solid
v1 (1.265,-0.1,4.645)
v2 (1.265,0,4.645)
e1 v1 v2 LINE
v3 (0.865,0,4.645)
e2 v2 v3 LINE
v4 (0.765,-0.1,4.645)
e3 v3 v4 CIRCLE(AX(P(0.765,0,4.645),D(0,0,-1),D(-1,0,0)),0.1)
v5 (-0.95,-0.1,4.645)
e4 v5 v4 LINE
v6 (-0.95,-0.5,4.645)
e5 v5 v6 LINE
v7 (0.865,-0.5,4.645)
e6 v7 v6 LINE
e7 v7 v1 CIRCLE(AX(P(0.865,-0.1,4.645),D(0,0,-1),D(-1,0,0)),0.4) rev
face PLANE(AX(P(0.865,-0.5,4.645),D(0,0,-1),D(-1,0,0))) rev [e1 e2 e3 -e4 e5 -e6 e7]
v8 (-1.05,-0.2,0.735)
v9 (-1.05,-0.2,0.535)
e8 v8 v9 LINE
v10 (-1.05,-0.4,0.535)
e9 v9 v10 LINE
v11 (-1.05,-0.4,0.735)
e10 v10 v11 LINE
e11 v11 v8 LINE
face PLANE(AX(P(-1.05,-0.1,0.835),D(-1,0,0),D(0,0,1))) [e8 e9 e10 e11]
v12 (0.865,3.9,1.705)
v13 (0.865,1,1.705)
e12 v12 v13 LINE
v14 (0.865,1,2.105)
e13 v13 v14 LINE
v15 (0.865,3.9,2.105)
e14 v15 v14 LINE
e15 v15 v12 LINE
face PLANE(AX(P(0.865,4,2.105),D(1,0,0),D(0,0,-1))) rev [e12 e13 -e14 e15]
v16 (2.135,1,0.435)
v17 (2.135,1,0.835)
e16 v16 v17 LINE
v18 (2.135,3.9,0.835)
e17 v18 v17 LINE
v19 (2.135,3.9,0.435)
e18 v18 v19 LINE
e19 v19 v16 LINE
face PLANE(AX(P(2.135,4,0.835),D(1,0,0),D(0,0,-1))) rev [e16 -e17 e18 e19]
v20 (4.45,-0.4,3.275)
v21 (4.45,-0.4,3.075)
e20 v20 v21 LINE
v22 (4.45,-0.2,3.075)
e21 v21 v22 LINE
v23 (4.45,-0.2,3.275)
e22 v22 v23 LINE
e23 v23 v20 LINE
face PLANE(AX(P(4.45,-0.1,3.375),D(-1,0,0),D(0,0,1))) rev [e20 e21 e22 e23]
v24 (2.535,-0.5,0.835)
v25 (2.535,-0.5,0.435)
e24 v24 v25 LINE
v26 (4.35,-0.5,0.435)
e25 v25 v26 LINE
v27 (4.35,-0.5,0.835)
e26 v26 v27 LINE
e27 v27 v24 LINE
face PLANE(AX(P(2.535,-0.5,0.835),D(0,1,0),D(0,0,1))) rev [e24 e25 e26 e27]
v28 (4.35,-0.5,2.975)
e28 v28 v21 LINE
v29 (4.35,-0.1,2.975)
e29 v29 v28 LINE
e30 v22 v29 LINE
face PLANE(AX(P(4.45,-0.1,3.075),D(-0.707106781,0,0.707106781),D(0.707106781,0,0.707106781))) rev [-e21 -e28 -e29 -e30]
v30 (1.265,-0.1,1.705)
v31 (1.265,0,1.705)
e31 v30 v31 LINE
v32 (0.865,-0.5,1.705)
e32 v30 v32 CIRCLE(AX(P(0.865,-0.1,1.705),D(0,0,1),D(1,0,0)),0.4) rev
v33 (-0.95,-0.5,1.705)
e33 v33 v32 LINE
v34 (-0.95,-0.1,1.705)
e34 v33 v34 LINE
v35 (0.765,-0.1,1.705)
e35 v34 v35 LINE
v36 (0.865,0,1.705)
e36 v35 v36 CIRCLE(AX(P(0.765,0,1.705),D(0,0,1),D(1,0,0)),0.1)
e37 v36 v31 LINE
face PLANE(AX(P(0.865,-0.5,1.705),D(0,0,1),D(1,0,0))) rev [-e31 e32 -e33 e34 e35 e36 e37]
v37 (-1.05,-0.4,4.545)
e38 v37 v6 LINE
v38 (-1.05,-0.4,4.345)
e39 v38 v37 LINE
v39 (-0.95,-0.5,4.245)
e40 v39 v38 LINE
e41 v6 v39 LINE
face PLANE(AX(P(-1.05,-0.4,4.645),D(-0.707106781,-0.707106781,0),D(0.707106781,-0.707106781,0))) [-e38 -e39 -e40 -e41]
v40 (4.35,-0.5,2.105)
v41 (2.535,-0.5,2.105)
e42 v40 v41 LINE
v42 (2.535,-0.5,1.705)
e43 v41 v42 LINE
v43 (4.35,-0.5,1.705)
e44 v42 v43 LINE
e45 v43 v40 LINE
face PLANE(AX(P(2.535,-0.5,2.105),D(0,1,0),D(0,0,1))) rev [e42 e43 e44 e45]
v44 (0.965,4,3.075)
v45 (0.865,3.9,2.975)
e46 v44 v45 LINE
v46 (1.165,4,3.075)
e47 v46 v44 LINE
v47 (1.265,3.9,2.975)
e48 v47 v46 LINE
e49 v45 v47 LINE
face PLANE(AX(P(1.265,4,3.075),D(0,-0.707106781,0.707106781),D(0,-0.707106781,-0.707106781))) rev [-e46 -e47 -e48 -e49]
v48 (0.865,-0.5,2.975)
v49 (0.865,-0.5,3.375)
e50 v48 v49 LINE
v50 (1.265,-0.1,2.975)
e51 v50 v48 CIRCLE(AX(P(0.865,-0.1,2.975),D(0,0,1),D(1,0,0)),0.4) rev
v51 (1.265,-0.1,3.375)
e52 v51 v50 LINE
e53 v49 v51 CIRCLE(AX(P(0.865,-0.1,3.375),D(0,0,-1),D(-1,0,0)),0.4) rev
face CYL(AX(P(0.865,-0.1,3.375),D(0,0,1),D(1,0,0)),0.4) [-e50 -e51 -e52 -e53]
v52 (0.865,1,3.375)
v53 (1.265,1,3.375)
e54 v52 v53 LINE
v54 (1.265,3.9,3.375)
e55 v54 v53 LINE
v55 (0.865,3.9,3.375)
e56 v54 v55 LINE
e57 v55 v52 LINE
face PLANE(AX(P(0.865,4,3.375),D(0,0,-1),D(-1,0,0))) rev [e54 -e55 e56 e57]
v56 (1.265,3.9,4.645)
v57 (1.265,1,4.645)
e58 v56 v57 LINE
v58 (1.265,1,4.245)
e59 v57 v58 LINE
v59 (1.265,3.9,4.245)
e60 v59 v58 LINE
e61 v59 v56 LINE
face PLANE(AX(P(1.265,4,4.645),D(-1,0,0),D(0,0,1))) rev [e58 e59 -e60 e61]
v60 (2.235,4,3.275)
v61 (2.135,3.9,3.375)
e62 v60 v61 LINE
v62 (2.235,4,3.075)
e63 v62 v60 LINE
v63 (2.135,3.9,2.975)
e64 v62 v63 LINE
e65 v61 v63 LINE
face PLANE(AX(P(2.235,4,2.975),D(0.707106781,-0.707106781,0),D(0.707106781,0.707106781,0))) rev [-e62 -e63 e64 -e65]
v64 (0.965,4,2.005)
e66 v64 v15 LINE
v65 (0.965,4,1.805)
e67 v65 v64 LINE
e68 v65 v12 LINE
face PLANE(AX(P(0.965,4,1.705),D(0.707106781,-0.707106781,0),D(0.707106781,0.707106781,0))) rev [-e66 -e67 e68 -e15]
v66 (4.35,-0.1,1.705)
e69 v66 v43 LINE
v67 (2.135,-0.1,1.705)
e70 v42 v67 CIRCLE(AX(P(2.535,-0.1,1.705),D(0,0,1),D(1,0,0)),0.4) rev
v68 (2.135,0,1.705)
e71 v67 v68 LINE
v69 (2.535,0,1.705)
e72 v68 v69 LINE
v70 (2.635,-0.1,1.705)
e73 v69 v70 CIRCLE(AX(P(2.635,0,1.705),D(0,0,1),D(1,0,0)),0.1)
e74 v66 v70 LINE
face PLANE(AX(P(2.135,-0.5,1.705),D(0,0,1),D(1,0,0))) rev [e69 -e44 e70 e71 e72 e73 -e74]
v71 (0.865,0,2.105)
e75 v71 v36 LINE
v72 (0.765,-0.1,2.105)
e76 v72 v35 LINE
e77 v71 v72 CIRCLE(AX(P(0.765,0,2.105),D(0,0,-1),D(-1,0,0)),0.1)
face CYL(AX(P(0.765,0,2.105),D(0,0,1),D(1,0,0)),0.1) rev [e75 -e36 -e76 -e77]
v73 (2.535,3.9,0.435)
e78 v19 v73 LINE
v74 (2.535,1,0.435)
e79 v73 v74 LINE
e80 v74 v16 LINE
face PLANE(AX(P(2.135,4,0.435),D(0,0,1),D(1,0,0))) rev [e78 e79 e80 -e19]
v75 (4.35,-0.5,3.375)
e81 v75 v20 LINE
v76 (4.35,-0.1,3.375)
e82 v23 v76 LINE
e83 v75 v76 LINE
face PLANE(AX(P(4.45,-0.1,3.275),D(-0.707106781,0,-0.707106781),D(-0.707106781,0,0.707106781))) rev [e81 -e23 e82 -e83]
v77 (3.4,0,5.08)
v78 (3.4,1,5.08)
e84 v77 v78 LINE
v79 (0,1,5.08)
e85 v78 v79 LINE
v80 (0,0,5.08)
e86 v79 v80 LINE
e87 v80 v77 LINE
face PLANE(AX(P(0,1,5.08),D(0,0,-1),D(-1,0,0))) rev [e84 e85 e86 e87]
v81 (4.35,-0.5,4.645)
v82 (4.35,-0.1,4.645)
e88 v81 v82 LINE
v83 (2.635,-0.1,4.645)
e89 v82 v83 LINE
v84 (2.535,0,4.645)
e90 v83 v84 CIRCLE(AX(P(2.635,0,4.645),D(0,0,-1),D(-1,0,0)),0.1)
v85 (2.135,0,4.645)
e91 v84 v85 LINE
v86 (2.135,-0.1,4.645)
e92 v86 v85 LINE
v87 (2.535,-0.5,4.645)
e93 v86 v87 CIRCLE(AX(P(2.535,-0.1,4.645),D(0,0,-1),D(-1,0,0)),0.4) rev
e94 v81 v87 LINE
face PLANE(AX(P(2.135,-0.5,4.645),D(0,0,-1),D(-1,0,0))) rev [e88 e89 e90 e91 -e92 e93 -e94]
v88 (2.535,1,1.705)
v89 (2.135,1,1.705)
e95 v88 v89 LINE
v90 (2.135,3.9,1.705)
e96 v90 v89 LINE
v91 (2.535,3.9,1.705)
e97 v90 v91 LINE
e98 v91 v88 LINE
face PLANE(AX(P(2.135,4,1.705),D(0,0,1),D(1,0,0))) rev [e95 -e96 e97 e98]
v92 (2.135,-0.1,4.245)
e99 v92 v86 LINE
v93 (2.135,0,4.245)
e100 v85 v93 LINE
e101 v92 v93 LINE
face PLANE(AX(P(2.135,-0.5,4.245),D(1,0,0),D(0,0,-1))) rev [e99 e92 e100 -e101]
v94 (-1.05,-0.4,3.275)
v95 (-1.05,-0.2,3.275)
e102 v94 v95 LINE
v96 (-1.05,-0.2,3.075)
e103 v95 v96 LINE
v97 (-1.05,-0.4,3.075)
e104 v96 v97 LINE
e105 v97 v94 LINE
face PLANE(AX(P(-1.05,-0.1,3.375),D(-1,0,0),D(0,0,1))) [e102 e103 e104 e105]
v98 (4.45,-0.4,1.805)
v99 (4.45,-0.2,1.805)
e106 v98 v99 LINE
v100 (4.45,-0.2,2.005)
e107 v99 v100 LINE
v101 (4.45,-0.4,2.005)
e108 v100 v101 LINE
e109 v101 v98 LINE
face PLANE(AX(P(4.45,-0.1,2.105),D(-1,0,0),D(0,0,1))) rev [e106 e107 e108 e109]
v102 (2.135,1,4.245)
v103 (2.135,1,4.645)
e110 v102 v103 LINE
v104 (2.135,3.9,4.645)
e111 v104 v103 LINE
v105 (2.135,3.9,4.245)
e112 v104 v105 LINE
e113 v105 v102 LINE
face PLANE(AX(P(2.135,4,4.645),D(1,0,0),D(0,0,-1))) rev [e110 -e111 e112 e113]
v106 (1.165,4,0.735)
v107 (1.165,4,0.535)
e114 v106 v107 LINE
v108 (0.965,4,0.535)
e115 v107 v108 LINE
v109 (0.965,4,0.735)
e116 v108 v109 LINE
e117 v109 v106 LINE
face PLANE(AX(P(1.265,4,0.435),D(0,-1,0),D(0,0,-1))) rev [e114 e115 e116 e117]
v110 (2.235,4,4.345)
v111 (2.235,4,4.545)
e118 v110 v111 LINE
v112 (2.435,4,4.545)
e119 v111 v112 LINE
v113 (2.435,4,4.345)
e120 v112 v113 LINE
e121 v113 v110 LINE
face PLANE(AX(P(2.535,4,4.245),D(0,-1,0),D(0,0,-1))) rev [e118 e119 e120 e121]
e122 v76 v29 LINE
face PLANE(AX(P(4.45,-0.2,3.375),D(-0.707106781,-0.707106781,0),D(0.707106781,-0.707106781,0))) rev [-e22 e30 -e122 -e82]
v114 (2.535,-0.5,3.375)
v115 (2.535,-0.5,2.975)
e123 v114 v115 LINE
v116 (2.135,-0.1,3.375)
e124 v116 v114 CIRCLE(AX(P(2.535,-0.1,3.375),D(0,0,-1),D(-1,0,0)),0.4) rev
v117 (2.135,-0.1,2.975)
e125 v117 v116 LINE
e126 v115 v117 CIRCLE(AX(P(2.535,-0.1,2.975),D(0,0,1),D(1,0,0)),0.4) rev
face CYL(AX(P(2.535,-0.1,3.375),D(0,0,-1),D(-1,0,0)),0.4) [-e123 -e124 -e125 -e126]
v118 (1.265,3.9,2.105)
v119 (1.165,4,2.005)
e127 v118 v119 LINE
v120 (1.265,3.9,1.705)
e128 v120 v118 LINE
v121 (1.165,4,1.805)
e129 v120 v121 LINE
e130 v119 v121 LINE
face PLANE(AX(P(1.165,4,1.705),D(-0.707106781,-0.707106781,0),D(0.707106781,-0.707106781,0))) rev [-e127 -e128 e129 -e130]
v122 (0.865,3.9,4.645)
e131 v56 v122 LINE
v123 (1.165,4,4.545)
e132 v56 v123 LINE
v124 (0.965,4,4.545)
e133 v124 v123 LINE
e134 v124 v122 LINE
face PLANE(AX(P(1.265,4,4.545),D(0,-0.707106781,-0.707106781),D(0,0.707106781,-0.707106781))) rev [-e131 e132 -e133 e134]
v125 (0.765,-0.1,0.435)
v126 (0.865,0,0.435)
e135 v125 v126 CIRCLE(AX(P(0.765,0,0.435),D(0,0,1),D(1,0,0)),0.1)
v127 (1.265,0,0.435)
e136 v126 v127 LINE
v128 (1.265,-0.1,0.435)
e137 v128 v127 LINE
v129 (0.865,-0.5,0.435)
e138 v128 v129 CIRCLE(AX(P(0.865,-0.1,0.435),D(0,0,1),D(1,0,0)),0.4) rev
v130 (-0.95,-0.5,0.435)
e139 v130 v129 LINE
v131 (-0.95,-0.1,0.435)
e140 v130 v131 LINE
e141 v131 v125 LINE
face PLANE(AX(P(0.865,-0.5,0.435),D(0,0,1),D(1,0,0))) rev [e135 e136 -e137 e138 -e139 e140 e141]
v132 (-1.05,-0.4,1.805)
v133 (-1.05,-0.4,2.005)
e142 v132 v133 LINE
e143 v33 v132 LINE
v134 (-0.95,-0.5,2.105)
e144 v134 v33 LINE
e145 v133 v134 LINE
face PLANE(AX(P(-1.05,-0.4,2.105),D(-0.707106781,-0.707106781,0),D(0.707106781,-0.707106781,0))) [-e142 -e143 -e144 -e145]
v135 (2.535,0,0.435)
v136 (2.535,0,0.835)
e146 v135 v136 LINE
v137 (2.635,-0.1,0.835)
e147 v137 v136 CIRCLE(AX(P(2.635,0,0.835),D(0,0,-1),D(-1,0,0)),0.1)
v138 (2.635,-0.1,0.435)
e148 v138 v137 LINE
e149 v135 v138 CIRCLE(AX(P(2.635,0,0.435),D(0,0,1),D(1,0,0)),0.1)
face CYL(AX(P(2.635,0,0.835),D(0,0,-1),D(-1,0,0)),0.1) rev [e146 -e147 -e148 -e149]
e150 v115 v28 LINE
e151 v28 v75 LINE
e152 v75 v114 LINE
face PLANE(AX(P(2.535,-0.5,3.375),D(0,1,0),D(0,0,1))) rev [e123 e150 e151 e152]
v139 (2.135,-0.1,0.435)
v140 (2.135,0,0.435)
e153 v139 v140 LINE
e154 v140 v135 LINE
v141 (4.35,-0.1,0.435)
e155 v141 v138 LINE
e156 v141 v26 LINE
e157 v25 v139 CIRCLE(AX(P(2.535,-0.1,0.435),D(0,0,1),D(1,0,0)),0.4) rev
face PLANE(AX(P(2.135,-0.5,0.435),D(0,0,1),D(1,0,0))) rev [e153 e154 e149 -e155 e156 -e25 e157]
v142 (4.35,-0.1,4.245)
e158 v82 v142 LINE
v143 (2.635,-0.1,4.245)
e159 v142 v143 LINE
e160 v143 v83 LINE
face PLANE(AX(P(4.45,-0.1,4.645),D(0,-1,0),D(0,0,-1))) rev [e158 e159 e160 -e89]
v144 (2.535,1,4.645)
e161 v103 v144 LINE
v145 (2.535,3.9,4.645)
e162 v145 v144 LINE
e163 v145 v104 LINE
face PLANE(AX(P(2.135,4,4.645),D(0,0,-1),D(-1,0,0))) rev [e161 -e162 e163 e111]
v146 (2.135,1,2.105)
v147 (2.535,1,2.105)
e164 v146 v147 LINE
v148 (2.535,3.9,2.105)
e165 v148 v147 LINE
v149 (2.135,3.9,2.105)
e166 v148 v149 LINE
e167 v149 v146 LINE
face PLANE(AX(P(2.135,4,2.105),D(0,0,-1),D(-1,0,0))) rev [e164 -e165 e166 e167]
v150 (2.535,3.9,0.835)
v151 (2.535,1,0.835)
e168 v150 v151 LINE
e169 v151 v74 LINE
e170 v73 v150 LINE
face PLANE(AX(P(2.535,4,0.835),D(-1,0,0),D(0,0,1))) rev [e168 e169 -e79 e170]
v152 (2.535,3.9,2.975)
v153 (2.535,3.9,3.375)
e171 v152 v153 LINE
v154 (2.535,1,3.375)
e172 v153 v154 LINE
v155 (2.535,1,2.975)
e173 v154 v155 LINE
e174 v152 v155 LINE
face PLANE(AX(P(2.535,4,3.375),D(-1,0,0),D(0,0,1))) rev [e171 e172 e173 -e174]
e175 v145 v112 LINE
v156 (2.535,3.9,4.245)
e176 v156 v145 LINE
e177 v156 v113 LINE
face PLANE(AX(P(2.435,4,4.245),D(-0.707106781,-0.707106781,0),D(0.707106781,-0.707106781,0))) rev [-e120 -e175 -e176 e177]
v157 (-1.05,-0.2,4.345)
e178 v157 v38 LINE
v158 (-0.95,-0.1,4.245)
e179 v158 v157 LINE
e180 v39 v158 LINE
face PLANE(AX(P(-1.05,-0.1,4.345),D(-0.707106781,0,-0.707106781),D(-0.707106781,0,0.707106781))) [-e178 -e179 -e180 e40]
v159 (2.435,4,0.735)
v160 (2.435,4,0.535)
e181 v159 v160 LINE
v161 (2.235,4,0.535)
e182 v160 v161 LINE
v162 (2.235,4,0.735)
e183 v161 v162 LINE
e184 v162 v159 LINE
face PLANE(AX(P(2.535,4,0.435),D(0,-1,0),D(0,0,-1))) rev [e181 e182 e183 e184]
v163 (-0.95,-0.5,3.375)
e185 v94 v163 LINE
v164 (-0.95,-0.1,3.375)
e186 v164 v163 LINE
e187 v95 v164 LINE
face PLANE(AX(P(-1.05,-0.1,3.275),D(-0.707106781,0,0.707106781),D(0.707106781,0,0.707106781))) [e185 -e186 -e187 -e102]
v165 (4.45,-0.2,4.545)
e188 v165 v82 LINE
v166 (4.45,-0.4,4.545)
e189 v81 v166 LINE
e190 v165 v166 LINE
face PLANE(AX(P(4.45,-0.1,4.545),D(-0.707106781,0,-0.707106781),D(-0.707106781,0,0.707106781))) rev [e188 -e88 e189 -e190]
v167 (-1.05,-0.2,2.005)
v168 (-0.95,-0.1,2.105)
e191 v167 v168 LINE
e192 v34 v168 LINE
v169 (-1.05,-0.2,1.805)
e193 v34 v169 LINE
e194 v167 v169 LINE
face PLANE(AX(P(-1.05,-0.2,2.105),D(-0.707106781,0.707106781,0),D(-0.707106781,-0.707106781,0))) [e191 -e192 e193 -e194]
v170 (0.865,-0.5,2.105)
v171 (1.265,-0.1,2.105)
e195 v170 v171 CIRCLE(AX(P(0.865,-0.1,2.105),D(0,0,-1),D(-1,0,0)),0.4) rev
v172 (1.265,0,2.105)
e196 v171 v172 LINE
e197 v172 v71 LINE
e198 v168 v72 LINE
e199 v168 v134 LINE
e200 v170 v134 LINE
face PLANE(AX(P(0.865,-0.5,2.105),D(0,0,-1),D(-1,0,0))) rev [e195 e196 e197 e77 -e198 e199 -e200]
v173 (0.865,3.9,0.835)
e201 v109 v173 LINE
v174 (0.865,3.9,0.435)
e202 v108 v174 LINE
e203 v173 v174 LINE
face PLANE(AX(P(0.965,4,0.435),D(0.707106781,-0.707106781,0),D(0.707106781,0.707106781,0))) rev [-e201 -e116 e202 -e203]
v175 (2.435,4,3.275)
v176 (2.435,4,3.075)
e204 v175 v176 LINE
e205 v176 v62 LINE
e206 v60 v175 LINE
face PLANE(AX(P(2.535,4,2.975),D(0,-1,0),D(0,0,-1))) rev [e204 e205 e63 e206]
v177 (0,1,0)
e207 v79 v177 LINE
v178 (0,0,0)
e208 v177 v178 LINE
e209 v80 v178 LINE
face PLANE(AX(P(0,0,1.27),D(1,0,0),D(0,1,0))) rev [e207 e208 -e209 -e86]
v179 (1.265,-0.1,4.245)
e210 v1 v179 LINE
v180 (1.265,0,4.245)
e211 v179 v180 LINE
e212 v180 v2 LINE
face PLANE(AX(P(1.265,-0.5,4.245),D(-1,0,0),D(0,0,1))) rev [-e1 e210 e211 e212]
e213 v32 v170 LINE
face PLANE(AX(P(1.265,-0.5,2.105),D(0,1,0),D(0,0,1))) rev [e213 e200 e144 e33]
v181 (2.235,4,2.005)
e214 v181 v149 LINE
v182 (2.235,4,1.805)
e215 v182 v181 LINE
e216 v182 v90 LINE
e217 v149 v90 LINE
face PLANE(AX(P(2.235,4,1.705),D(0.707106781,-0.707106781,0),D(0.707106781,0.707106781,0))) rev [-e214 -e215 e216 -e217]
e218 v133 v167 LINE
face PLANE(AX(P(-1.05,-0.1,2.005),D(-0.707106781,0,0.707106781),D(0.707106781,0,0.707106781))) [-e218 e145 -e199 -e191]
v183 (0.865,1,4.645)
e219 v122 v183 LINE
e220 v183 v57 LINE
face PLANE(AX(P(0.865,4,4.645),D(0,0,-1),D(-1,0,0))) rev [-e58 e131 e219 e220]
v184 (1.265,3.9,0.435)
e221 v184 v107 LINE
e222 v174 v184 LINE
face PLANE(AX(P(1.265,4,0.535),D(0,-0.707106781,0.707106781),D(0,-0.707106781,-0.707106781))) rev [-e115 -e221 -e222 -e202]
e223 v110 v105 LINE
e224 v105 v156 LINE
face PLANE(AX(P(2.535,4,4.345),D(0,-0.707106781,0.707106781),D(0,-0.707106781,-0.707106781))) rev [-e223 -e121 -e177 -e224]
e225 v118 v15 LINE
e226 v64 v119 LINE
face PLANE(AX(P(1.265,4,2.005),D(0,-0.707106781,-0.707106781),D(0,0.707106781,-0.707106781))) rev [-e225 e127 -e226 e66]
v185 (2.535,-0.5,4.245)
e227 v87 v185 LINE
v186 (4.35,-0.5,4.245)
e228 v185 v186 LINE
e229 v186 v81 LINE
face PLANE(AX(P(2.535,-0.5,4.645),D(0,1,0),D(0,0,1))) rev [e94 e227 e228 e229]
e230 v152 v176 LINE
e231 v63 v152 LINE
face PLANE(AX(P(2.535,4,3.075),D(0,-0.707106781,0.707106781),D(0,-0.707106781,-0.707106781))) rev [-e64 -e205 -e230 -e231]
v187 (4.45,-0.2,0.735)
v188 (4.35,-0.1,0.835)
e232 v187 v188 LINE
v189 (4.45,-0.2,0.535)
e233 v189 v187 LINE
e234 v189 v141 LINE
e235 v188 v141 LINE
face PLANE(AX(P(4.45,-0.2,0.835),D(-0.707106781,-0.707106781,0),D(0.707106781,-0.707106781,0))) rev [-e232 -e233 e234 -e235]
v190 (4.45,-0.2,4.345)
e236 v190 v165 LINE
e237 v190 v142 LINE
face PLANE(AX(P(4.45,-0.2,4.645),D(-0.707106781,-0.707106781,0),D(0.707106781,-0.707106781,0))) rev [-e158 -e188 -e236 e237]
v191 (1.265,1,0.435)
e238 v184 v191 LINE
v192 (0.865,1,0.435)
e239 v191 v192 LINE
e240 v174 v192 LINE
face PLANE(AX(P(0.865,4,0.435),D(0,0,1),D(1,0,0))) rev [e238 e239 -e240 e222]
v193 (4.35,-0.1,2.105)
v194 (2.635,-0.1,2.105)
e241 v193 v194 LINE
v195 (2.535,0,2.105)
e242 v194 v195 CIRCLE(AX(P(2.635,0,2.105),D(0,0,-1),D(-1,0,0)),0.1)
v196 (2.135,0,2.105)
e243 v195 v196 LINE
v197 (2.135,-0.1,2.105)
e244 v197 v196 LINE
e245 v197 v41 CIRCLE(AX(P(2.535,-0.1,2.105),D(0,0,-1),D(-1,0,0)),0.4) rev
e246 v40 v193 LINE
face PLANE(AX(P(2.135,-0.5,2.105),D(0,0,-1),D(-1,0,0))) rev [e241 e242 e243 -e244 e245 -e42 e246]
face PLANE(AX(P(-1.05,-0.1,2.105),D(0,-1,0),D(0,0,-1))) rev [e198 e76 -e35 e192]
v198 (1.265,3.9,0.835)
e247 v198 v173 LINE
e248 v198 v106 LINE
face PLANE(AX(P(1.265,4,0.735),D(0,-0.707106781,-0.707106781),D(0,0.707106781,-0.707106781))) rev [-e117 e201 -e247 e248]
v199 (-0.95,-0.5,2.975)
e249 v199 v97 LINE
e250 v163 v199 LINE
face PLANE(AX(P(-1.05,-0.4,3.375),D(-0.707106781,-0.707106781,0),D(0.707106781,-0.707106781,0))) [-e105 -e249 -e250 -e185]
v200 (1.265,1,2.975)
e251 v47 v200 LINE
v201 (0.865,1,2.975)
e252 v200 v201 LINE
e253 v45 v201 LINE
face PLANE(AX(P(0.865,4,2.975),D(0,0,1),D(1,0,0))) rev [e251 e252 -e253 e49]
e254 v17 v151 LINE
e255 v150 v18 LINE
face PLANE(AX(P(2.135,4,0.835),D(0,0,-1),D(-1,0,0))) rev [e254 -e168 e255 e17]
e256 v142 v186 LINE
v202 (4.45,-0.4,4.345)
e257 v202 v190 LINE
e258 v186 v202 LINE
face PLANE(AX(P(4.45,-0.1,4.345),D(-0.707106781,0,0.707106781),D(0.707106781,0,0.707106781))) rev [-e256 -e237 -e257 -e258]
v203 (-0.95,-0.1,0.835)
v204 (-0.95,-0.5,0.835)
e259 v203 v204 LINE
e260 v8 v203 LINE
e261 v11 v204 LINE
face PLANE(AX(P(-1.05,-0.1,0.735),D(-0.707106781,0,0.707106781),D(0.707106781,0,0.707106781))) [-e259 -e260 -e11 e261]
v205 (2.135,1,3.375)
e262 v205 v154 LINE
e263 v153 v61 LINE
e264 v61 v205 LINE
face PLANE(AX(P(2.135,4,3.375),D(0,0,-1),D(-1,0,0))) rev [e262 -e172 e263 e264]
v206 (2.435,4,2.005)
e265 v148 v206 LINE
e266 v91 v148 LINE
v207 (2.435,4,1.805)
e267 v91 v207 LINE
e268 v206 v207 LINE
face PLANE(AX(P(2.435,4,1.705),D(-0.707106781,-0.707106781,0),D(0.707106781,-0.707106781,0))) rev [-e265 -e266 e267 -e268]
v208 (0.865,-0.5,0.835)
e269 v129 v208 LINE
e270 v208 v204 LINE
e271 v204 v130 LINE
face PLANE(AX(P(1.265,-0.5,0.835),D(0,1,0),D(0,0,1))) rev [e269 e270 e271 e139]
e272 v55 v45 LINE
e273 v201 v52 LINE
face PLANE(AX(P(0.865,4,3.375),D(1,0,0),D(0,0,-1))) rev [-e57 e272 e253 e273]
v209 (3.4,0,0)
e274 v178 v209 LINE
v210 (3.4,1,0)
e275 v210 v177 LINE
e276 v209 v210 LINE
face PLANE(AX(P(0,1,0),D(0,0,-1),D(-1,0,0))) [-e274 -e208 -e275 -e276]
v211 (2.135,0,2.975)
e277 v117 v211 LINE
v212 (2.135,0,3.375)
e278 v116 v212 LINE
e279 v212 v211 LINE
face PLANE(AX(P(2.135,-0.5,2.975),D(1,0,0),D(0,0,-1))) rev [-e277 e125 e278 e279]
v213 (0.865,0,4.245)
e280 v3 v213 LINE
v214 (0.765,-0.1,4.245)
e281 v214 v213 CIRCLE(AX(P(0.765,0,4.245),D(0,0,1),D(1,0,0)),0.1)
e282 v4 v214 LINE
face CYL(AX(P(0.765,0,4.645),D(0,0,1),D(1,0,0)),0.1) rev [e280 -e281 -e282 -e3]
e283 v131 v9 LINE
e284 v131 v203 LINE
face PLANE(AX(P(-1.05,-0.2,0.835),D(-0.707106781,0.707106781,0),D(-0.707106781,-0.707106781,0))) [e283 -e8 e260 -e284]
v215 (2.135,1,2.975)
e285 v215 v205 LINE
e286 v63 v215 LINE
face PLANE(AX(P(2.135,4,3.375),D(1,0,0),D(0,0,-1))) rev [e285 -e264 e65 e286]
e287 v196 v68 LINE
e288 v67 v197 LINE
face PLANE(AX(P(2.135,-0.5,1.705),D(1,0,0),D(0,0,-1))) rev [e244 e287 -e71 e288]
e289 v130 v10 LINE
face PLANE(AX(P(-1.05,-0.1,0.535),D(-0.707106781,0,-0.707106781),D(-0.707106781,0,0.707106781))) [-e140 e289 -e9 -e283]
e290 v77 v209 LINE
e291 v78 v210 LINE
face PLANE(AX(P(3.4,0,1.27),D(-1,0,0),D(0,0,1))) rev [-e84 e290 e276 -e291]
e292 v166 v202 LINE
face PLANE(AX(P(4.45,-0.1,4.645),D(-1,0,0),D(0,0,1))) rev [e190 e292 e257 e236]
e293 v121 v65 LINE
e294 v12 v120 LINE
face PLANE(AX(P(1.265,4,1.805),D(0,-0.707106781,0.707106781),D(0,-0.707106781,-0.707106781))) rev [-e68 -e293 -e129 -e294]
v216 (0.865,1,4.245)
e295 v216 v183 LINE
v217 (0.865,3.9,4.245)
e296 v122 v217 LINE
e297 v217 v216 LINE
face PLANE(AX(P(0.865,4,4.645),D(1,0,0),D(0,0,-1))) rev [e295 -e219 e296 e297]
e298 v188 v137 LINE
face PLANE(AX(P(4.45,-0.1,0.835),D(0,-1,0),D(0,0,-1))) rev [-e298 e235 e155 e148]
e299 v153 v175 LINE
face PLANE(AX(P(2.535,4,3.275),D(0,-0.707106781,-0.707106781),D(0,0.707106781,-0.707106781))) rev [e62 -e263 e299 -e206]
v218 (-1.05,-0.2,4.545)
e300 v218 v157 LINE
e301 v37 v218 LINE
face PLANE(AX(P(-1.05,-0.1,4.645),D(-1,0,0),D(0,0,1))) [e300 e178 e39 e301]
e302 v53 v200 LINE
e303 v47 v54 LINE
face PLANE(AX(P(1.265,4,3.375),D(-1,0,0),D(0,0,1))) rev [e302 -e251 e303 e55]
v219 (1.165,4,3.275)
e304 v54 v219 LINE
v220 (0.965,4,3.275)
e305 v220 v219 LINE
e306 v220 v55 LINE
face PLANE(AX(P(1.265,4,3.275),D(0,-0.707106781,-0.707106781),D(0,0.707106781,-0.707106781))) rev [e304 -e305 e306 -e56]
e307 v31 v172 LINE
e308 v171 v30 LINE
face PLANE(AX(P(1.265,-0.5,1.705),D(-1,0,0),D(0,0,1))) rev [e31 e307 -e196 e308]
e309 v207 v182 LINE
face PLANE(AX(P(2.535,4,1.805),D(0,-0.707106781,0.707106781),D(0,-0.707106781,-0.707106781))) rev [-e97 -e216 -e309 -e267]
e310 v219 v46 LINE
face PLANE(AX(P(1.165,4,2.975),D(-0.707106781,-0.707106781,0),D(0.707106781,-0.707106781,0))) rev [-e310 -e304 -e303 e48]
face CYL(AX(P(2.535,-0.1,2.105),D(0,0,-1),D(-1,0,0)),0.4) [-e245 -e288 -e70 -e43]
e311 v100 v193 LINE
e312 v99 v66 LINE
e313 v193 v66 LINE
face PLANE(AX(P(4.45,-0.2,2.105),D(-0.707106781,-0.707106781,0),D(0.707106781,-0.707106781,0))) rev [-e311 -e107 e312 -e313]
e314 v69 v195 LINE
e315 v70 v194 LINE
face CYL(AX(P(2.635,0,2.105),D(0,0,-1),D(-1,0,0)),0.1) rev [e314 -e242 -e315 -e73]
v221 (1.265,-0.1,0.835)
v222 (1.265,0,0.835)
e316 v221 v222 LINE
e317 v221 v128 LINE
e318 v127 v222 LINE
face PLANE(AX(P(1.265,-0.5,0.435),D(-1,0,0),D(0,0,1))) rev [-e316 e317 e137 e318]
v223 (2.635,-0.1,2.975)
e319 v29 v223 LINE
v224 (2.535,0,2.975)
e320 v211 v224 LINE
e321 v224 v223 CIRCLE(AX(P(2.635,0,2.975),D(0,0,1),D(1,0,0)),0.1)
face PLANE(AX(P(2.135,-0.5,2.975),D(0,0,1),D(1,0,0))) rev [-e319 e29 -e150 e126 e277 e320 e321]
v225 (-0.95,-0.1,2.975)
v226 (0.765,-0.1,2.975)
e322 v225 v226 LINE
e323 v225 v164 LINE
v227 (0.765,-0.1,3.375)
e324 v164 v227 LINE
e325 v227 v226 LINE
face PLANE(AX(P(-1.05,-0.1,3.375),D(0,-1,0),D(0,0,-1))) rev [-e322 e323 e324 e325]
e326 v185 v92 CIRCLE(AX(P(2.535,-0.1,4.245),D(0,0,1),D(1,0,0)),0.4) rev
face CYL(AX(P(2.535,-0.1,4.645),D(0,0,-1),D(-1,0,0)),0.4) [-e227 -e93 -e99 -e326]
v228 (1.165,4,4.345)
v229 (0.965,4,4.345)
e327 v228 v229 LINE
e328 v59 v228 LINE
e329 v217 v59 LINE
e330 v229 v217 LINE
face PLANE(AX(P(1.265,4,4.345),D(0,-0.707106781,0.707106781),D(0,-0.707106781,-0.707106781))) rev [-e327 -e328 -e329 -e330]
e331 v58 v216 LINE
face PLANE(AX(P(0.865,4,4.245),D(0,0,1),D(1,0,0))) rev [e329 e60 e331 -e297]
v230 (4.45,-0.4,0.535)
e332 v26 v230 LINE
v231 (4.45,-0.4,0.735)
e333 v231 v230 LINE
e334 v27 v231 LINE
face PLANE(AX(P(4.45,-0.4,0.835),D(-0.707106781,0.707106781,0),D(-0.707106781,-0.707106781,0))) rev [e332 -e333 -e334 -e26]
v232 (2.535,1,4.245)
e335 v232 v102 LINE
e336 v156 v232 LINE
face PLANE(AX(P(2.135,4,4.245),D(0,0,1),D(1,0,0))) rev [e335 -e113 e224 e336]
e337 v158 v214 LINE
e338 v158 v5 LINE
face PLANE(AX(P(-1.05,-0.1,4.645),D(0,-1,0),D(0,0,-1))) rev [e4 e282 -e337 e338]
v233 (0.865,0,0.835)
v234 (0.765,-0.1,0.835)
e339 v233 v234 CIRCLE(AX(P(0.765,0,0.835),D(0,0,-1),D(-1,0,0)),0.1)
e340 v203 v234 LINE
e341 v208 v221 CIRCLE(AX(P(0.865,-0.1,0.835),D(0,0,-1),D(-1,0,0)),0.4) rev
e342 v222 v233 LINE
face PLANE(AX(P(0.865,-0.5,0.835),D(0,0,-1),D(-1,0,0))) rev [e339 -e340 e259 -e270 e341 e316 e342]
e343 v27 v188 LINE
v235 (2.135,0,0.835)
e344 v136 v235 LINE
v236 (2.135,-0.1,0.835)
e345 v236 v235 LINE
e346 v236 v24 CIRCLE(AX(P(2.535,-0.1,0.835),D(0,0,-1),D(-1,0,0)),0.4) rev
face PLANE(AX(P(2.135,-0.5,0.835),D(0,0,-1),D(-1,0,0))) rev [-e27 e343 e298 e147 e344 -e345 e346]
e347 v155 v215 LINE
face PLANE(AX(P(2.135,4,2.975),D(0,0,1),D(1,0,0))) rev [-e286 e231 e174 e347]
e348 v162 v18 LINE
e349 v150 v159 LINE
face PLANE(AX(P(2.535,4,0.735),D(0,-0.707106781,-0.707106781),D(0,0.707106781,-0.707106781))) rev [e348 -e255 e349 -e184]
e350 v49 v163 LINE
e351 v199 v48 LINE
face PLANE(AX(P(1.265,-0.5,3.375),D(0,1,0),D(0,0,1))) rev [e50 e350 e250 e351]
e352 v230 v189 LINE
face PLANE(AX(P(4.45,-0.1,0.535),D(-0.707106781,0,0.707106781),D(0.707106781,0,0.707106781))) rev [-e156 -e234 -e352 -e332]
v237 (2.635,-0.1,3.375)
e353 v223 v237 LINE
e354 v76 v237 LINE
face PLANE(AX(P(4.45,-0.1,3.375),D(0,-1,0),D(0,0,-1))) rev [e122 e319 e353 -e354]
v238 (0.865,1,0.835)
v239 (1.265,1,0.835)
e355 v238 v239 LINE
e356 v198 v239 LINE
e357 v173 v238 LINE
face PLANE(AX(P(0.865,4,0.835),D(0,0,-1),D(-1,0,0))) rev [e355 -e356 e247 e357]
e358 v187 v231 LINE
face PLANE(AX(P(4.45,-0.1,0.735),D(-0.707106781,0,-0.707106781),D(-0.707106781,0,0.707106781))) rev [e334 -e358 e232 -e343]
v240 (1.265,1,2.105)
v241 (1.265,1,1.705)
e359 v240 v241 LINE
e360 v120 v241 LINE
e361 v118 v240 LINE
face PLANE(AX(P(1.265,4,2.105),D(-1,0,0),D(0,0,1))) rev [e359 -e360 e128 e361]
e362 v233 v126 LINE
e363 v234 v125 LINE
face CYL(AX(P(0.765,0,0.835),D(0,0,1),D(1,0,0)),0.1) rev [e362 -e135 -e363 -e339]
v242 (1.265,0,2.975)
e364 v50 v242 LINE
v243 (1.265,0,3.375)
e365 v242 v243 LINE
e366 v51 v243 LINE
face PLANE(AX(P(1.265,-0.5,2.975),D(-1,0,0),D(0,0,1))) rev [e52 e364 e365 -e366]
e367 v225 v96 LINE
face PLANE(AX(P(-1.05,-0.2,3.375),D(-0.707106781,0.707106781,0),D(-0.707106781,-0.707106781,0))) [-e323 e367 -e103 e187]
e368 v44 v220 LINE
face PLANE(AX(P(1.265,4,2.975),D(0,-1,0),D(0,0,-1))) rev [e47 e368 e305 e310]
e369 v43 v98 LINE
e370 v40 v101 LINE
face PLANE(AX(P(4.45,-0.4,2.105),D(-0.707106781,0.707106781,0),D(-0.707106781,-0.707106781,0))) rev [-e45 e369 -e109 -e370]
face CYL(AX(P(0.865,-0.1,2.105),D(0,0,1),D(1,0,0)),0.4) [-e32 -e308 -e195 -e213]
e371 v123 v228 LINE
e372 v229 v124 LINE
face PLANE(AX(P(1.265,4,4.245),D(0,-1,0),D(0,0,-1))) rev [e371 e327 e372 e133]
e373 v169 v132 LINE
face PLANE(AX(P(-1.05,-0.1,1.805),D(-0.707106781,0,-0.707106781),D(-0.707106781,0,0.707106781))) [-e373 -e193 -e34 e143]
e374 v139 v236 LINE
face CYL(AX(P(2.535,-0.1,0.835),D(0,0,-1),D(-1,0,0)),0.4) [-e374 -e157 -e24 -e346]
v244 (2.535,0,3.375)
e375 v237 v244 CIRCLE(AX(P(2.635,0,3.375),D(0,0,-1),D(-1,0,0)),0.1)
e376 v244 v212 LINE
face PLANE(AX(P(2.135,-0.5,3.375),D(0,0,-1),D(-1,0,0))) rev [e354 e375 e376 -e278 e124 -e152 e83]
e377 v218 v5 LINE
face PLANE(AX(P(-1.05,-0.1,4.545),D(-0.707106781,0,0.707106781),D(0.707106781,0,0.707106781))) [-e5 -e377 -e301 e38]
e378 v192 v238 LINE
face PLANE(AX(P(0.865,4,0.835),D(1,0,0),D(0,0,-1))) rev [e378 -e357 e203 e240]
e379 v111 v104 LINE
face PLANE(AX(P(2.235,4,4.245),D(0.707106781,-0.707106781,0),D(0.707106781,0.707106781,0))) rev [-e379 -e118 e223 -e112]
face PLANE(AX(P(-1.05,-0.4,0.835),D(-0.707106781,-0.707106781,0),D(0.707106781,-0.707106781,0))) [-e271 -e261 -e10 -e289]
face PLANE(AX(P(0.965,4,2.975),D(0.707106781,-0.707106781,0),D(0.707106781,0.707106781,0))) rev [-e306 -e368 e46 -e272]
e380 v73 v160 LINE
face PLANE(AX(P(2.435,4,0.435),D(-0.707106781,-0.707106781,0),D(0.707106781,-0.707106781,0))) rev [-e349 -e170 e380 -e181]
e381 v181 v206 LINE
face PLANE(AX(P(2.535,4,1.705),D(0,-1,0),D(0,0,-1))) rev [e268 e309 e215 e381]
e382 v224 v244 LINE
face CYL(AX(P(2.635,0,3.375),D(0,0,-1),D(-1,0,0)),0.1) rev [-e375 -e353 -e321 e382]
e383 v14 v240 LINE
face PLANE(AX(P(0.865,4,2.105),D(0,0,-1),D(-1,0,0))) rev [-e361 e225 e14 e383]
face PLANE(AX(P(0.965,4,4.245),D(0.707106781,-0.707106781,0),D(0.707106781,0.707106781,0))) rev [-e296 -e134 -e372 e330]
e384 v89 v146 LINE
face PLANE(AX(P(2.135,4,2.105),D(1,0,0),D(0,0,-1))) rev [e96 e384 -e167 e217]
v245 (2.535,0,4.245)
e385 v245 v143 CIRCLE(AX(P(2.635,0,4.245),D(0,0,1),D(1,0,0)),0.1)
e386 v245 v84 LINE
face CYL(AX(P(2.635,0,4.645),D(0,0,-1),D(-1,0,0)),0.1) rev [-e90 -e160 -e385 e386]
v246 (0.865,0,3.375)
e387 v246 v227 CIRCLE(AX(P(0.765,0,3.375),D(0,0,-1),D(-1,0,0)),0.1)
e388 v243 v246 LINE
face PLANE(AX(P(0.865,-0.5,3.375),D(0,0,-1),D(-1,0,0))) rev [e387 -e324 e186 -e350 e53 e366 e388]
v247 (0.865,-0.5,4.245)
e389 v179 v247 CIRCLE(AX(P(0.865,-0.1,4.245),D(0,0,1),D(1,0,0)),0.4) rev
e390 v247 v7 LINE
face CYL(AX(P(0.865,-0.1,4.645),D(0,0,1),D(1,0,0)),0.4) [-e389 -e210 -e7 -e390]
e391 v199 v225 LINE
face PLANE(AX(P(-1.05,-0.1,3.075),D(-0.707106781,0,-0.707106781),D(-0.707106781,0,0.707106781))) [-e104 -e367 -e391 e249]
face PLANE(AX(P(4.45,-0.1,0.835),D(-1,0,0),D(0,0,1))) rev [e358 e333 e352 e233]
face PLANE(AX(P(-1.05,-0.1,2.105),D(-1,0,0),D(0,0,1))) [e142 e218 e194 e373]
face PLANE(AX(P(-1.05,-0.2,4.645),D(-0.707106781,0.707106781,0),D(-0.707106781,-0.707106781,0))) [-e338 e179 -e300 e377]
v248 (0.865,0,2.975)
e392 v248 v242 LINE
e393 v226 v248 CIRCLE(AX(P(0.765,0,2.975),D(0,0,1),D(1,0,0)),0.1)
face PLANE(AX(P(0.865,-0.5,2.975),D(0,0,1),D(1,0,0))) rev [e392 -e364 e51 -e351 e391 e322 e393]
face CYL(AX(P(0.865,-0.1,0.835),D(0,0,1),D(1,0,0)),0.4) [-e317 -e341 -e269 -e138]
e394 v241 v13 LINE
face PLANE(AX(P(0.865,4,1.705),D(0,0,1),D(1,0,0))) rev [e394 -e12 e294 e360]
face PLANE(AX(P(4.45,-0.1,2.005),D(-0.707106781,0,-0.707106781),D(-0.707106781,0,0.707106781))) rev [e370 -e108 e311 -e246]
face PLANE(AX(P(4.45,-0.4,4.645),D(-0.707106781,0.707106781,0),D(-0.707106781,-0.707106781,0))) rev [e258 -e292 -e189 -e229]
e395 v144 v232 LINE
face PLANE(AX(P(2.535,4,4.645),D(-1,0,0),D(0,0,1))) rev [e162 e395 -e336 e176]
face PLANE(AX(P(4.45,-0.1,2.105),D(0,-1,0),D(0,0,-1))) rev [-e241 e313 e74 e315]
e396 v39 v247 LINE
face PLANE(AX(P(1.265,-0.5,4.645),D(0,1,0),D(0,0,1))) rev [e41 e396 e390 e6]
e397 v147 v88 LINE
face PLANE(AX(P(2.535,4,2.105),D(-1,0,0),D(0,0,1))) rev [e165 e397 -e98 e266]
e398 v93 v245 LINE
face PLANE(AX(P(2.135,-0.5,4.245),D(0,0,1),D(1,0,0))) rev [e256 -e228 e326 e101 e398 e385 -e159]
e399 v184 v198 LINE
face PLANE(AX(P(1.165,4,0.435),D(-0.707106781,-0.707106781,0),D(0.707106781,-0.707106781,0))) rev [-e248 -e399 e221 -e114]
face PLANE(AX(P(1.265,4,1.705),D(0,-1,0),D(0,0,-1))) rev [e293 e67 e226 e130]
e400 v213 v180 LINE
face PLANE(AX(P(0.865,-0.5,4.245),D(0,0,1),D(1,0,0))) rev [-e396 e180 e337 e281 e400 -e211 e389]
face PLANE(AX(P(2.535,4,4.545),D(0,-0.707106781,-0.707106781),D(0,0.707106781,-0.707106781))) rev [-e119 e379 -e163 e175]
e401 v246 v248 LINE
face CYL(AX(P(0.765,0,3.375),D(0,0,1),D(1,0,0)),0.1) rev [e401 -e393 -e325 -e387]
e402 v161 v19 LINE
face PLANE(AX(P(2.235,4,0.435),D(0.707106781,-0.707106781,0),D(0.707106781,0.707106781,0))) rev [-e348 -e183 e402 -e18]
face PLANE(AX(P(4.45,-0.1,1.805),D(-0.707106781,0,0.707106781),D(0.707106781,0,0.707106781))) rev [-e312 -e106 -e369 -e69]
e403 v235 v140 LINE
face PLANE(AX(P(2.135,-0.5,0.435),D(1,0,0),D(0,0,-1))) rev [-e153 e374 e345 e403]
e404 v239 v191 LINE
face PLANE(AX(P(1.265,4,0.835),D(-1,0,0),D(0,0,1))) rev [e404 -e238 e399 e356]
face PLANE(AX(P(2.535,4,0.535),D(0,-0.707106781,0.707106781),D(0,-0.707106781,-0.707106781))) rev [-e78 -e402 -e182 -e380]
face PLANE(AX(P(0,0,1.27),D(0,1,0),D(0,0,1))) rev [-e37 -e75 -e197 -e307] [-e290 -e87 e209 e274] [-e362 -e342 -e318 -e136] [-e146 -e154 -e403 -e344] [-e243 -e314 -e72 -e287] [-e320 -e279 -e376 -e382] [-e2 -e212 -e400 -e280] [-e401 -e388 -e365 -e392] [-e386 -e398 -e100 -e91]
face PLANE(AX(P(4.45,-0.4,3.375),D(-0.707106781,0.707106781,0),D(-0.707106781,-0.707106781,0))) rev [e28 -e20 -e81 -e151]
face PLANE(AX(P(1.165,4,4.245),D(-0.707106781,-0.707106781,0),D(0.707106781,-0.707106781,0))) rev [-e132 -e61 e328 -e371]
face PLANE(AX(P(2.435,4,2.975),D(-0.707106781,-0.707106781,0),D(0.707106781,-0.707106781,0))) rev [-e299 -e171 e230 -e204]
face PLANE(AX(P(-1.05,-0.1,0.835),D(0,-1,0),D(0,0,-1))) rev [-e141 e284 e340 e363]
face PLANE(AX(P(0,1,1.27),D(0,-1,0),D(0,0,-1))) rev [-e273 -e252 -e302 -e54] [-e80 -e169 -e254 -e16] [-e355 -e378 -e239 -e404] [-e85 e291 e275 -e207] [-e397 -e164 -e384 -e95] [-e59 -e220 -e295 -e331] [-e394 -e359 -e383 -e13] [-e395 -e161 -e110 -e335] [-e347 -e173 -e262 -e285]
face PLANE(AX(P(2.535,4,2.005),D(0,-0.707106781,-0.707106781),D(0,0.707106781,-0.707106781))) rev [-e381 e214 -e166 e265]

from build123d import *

# Parameters (mm, degrees)
SKIZZE1_W                         = 3.4
SKIZZE1_H                         = 1
AUFSATZ_LINEAR_AUSTRAGEN1_DEPTH   = 1.27
SKIZZE3_W                         = 0.4
SKIZZE3_H                         = 0.4
AUFSATZ_LINEAR_AUSTRAGEN3_DEPTH   = 0.5
SKIZZE4_W                         = 0.4
SKIZZE4_H                         = 0.4
AUFSATZ_LINEAR_AUSTRAGEN4_DEPTH   = 1.915
SKIZZE5_W                         = 0.4
SKIZZE5_H                         = 0.4
AUFSATZ_LINEAR_AUSTRAGEN5_DEPTH   = 1.915
SKIZZE6_W                         = 0.4
SKIZZE6_H                         = 0.4
AUFSATZ_LINEAR_AUSTRAGEN6_DEPTH   = 3
FASE2_SIZE                        = 0.1
VERRUNDUNG1_R                     = 0.1
VERRUNDUNG2_R                     = 0.4
LINEARES_MUSTER1_COUNT            = 4
LINEARES_MUSTER1_PITCH            = 1.27
FASE2_OF_LINEARES_MUSTER1_SIZE    = 0.1
VERRUNDUNG1_OF_LINEARES_MUSTER1_R = 0.1
VERRUNDUNG2_OF_LINEARES_MUSTER1_R = 0.4


with BuildPart() as part:
    # Skizze1 → Aufsatz-Linear austragen1 (new body)
    with BuildSketch(Plane.XY):
        with Locations((1.7, 0.5)):
            Rectangle(SKIZZE1_W, SKIZZE1_H)
    aufsatz_linear_austragen1 = extrude(amount=AUFSATZ_LINEAR_AUSTRAGEN1_DEPTH)

    # Skizze3 → Aufsatz-Linear austragen3 (add)
    with BuildSketch(Plane.XZ):
        with Locations((1.065, 0.635)):
            Rectangle(SKIZZE3_W, SKIZZE3_H)
        with Locations((2.335, 0.635)):
            Rectangle(SKIZZE3_W, SKIZZE3_H)
    aufsatz_linear_austragen3 = extrude(amount=AUFSATZ_LINEAR_AUSTRAGEN3_DEPTH)

    # Skizze4 → Aufsatz-Linear austragen4 (add)
    with BuildSketch(Plane(origin=(2.535, 0, 0), x_dir=(0, 0, -1), z_dir=(1, 0, 0))):
        with Locations((-0.635, -0.3)):
            Rectangle(SKIZZE4_W, SKIZZE4_H)
    aufsatz_linear_austragen4 = extrude(amount=AUFSATZ_LINEAR_AUSTRAGEN4_DEPTH)

    # Skizze5 → Aufsatz-Linear austragen5 (add)
    with BuildSketch(Plane.ZY.offset(-0.865)):
        with Locations((0.635, -0.3)):
            Rectangle(SKIZZE5_W, SKIZZE5_H)
    aufsatz_linear_austragen5 = extrude(amount=AUFSATZ_LINEAR_AUSTRAGEN5_DEPTH)

    # Skizze6 → Aufsatz-Linear austragen6 (add)
    with BuildSketch(Plane(origin=(0, 1, 0), x_dir=(1, 0, 0), z_dir=(0, 1, 0))):
        with Locations((1.065, -0.635)):
            Rectangle(SKIZZE6_W, SKIZZE6_H)
        with Locations((2.335, -0.635)):
            Rectangle(SKIZZE6_W, SKIZZE6_H)
    aufsatz_linear_austragen6 = extrude(amount=AUFSATZ_LINEAR_AUSTRAGEN6_DEPTH)

    # Fase2
    fase2_edges = [part.edges().sort_by_distance(p)[0] for p in [
        (4.45, -0.3, 0.835),
        (4.45, -0.5, 0.635),
        (4.45, -0.3, 0.435),
        (4.45, -0.1, 0.635),
        (-1.05, -0.3, 0.835),
        (-1.05, -0.1, 0.635),
        (-1.05, -0.3, 0.435),
        (-1.05, -0.5, 0.635),
        (1.265, 4, 0.635),
        (1.065, 4, 0.435),
        (0.865, 4, 0.635),
        (1.065, 4, 0.835),
        (2.535, 4, 0.635),
        (2.335, 4, 0.435),
        (2.135, 4, 0.635),
        (2.335, 4, 0.835),
    ]]
    chamfer(fase2_edges, length=FASE2_SIZE)

    # Verrundung1
    verrundung1_edges = [part.edges().sort_by_distance(p)[0] for p in [
        (0.865, -0.1, 0.635),
        (2.535, -0.1, 0.635),
    ]]
    fillet(verrundung1_edges, radius=VERRUNDUNG1_R - 0.0001)  # a hair under: the kernel refuses the full size

    # Verrundung2
    verrundung2_edges = [part.edges().sort_by_distance(p)[0] for p in [
        (1.265, -0.5, 0.635),
        (2.135, -0.5, 0.635),
    ]]
    fillet(verrundung2_edges, radius=VERRUNDUNG2_R)

    # Lineares Muster1: Aufsatz-Linear austragen1, Aufsatz-Linear austragen3, Aufsatz-Linear austragen4, Aufsatz-Linear austragen5, Aufsatz-Linear austragen6 ×4
    with Locations(*[(0, 0, i * LINEARES_MUSTER1_PITCH) for i in range(1, LINEARES_MUSTER1_COUNT)]):
        add(aufsatz_linear_austragen1)
        add(aufsatz_linear_austragen3)
        add(aufsatz_linear_austragen4)
        add(aufsatz_linear_austragen5)
        add(aufsatz_linear_austragen6)

    # Fase2 of Lineares Muster1
    fase2_of_lineares_muster1_edges = [part.edges().sort_by_distance(p)[0] for p in [
        (4.45, -0.3, 2.105),
        (4.45, -0.5, 1.905),
        (4.45, -0.3, 1.705),
        (4.45, -0.1, 1.905),
        (-1.05, -0.3, 2.105),
        (-1.05, -0.1, 1.905),
        (-1.05, -0.3, 1.705),
        (-1.05, -0.5, 1.905),
        (1.265, 4, 1.905),
        (1.065, 4, 1.705),
        (0.865, 4, 1.905),
        (1.065, 4, 2.105),
        (2.535, 4, 1.905),
        (2.335, 4, 1.705),
        (2.135, 4, 1.905),
        (2.335, 4, 2.105),
        (4.45, -0.3, 3.375),
        (4.45, -0.5, 3.175),
        (4.45, -0.3, 2.975),
        (4.45, -0.1, 3.175),
        (-1.05, -0.3, 3.375),
        (-1.05, -0.1, 3.175),
        (-1.05, -0.3, 2.975),
        (-1.05, -0.5, 3.175),
        (1.265, 4, 3.175),
        (1.065, 4, 2.975),
        (0.865, 4, 3.175),
        (1.065, 4, 3.375),
        (2.535, 4, 3.175),
        (2.335, 4, 2.975),
        (2.135, 4, 3.175),
        (2.335, 4, 3.375),
        (4.45, -0.3, 4.645),
        (4.45, -0.5, 4.445),
        (4.45, -0.3, 4.245),
        (4.45, -0.1, 4.445),
        (-1.05, -0.3, 4.645),
        (-1.05, -0.1, 4.445),
        (-1.05, -0.3, 4.245),
        (-1.05, -0.5, 4.445),
        (1.265, 4, 4.445),
        (1.065, 4, 4.245),
        (0.865, 4, 4.445),
        (1.065, 4, 4.645),
        (2.535, 4, 4.445),
        (2.335, 4, 4.245),
        (2.135, 4, 4.445),
        (2.335, 4, 4.645),
    ]]
    chamfer(fase2_of_lineares_muster1_edges, length=FASE2_OF_LINEARES_MUSTER1_SIZE)

    # Verrundung1 of Lineares Muster1
    verrundung1_of_lineares_muster1_edges = [part.edges().sort_by_distance(p)[0] for p in [
        (0.865, -0.1, 1.905),
        (2.535, -0.1, 1.905),
        (0.865, -0.1, 3.175),
        (2.535, -0.1, 3.175),
        (0.865, -0.1, 4.445),
        (2.535, -0.1, 4.445),
    ]]
    fillet(verrundung1_of_lineares_muster1_edges, radius=VERRUNDUNG1_OF_LINEARES_MUSTER1_R - 0.0001)  # a hair under: the kernel refuses the full size

    # Verrundung2 of Lineares Muster1
    verrundung2_of_lineares_muster1_edges = [part.edges().sort_by_distance(p)[0] for p in [
        (1.265, -0.5, 1.905),
        (2.135, -0.5, 1.905),
        (1.265, -0.5, 3.175),
        (2.135, -0.5, 3.175),
        (1.265, -0.5, 4.445),
        (2.135, -0.5, 4.445),
    ]]
    fillet(verrundung2_of_lineares_muster1_edges, radius=VERRUNDUNG2_OF_LINEARES_MUSTER1_R)


solid = part.part
